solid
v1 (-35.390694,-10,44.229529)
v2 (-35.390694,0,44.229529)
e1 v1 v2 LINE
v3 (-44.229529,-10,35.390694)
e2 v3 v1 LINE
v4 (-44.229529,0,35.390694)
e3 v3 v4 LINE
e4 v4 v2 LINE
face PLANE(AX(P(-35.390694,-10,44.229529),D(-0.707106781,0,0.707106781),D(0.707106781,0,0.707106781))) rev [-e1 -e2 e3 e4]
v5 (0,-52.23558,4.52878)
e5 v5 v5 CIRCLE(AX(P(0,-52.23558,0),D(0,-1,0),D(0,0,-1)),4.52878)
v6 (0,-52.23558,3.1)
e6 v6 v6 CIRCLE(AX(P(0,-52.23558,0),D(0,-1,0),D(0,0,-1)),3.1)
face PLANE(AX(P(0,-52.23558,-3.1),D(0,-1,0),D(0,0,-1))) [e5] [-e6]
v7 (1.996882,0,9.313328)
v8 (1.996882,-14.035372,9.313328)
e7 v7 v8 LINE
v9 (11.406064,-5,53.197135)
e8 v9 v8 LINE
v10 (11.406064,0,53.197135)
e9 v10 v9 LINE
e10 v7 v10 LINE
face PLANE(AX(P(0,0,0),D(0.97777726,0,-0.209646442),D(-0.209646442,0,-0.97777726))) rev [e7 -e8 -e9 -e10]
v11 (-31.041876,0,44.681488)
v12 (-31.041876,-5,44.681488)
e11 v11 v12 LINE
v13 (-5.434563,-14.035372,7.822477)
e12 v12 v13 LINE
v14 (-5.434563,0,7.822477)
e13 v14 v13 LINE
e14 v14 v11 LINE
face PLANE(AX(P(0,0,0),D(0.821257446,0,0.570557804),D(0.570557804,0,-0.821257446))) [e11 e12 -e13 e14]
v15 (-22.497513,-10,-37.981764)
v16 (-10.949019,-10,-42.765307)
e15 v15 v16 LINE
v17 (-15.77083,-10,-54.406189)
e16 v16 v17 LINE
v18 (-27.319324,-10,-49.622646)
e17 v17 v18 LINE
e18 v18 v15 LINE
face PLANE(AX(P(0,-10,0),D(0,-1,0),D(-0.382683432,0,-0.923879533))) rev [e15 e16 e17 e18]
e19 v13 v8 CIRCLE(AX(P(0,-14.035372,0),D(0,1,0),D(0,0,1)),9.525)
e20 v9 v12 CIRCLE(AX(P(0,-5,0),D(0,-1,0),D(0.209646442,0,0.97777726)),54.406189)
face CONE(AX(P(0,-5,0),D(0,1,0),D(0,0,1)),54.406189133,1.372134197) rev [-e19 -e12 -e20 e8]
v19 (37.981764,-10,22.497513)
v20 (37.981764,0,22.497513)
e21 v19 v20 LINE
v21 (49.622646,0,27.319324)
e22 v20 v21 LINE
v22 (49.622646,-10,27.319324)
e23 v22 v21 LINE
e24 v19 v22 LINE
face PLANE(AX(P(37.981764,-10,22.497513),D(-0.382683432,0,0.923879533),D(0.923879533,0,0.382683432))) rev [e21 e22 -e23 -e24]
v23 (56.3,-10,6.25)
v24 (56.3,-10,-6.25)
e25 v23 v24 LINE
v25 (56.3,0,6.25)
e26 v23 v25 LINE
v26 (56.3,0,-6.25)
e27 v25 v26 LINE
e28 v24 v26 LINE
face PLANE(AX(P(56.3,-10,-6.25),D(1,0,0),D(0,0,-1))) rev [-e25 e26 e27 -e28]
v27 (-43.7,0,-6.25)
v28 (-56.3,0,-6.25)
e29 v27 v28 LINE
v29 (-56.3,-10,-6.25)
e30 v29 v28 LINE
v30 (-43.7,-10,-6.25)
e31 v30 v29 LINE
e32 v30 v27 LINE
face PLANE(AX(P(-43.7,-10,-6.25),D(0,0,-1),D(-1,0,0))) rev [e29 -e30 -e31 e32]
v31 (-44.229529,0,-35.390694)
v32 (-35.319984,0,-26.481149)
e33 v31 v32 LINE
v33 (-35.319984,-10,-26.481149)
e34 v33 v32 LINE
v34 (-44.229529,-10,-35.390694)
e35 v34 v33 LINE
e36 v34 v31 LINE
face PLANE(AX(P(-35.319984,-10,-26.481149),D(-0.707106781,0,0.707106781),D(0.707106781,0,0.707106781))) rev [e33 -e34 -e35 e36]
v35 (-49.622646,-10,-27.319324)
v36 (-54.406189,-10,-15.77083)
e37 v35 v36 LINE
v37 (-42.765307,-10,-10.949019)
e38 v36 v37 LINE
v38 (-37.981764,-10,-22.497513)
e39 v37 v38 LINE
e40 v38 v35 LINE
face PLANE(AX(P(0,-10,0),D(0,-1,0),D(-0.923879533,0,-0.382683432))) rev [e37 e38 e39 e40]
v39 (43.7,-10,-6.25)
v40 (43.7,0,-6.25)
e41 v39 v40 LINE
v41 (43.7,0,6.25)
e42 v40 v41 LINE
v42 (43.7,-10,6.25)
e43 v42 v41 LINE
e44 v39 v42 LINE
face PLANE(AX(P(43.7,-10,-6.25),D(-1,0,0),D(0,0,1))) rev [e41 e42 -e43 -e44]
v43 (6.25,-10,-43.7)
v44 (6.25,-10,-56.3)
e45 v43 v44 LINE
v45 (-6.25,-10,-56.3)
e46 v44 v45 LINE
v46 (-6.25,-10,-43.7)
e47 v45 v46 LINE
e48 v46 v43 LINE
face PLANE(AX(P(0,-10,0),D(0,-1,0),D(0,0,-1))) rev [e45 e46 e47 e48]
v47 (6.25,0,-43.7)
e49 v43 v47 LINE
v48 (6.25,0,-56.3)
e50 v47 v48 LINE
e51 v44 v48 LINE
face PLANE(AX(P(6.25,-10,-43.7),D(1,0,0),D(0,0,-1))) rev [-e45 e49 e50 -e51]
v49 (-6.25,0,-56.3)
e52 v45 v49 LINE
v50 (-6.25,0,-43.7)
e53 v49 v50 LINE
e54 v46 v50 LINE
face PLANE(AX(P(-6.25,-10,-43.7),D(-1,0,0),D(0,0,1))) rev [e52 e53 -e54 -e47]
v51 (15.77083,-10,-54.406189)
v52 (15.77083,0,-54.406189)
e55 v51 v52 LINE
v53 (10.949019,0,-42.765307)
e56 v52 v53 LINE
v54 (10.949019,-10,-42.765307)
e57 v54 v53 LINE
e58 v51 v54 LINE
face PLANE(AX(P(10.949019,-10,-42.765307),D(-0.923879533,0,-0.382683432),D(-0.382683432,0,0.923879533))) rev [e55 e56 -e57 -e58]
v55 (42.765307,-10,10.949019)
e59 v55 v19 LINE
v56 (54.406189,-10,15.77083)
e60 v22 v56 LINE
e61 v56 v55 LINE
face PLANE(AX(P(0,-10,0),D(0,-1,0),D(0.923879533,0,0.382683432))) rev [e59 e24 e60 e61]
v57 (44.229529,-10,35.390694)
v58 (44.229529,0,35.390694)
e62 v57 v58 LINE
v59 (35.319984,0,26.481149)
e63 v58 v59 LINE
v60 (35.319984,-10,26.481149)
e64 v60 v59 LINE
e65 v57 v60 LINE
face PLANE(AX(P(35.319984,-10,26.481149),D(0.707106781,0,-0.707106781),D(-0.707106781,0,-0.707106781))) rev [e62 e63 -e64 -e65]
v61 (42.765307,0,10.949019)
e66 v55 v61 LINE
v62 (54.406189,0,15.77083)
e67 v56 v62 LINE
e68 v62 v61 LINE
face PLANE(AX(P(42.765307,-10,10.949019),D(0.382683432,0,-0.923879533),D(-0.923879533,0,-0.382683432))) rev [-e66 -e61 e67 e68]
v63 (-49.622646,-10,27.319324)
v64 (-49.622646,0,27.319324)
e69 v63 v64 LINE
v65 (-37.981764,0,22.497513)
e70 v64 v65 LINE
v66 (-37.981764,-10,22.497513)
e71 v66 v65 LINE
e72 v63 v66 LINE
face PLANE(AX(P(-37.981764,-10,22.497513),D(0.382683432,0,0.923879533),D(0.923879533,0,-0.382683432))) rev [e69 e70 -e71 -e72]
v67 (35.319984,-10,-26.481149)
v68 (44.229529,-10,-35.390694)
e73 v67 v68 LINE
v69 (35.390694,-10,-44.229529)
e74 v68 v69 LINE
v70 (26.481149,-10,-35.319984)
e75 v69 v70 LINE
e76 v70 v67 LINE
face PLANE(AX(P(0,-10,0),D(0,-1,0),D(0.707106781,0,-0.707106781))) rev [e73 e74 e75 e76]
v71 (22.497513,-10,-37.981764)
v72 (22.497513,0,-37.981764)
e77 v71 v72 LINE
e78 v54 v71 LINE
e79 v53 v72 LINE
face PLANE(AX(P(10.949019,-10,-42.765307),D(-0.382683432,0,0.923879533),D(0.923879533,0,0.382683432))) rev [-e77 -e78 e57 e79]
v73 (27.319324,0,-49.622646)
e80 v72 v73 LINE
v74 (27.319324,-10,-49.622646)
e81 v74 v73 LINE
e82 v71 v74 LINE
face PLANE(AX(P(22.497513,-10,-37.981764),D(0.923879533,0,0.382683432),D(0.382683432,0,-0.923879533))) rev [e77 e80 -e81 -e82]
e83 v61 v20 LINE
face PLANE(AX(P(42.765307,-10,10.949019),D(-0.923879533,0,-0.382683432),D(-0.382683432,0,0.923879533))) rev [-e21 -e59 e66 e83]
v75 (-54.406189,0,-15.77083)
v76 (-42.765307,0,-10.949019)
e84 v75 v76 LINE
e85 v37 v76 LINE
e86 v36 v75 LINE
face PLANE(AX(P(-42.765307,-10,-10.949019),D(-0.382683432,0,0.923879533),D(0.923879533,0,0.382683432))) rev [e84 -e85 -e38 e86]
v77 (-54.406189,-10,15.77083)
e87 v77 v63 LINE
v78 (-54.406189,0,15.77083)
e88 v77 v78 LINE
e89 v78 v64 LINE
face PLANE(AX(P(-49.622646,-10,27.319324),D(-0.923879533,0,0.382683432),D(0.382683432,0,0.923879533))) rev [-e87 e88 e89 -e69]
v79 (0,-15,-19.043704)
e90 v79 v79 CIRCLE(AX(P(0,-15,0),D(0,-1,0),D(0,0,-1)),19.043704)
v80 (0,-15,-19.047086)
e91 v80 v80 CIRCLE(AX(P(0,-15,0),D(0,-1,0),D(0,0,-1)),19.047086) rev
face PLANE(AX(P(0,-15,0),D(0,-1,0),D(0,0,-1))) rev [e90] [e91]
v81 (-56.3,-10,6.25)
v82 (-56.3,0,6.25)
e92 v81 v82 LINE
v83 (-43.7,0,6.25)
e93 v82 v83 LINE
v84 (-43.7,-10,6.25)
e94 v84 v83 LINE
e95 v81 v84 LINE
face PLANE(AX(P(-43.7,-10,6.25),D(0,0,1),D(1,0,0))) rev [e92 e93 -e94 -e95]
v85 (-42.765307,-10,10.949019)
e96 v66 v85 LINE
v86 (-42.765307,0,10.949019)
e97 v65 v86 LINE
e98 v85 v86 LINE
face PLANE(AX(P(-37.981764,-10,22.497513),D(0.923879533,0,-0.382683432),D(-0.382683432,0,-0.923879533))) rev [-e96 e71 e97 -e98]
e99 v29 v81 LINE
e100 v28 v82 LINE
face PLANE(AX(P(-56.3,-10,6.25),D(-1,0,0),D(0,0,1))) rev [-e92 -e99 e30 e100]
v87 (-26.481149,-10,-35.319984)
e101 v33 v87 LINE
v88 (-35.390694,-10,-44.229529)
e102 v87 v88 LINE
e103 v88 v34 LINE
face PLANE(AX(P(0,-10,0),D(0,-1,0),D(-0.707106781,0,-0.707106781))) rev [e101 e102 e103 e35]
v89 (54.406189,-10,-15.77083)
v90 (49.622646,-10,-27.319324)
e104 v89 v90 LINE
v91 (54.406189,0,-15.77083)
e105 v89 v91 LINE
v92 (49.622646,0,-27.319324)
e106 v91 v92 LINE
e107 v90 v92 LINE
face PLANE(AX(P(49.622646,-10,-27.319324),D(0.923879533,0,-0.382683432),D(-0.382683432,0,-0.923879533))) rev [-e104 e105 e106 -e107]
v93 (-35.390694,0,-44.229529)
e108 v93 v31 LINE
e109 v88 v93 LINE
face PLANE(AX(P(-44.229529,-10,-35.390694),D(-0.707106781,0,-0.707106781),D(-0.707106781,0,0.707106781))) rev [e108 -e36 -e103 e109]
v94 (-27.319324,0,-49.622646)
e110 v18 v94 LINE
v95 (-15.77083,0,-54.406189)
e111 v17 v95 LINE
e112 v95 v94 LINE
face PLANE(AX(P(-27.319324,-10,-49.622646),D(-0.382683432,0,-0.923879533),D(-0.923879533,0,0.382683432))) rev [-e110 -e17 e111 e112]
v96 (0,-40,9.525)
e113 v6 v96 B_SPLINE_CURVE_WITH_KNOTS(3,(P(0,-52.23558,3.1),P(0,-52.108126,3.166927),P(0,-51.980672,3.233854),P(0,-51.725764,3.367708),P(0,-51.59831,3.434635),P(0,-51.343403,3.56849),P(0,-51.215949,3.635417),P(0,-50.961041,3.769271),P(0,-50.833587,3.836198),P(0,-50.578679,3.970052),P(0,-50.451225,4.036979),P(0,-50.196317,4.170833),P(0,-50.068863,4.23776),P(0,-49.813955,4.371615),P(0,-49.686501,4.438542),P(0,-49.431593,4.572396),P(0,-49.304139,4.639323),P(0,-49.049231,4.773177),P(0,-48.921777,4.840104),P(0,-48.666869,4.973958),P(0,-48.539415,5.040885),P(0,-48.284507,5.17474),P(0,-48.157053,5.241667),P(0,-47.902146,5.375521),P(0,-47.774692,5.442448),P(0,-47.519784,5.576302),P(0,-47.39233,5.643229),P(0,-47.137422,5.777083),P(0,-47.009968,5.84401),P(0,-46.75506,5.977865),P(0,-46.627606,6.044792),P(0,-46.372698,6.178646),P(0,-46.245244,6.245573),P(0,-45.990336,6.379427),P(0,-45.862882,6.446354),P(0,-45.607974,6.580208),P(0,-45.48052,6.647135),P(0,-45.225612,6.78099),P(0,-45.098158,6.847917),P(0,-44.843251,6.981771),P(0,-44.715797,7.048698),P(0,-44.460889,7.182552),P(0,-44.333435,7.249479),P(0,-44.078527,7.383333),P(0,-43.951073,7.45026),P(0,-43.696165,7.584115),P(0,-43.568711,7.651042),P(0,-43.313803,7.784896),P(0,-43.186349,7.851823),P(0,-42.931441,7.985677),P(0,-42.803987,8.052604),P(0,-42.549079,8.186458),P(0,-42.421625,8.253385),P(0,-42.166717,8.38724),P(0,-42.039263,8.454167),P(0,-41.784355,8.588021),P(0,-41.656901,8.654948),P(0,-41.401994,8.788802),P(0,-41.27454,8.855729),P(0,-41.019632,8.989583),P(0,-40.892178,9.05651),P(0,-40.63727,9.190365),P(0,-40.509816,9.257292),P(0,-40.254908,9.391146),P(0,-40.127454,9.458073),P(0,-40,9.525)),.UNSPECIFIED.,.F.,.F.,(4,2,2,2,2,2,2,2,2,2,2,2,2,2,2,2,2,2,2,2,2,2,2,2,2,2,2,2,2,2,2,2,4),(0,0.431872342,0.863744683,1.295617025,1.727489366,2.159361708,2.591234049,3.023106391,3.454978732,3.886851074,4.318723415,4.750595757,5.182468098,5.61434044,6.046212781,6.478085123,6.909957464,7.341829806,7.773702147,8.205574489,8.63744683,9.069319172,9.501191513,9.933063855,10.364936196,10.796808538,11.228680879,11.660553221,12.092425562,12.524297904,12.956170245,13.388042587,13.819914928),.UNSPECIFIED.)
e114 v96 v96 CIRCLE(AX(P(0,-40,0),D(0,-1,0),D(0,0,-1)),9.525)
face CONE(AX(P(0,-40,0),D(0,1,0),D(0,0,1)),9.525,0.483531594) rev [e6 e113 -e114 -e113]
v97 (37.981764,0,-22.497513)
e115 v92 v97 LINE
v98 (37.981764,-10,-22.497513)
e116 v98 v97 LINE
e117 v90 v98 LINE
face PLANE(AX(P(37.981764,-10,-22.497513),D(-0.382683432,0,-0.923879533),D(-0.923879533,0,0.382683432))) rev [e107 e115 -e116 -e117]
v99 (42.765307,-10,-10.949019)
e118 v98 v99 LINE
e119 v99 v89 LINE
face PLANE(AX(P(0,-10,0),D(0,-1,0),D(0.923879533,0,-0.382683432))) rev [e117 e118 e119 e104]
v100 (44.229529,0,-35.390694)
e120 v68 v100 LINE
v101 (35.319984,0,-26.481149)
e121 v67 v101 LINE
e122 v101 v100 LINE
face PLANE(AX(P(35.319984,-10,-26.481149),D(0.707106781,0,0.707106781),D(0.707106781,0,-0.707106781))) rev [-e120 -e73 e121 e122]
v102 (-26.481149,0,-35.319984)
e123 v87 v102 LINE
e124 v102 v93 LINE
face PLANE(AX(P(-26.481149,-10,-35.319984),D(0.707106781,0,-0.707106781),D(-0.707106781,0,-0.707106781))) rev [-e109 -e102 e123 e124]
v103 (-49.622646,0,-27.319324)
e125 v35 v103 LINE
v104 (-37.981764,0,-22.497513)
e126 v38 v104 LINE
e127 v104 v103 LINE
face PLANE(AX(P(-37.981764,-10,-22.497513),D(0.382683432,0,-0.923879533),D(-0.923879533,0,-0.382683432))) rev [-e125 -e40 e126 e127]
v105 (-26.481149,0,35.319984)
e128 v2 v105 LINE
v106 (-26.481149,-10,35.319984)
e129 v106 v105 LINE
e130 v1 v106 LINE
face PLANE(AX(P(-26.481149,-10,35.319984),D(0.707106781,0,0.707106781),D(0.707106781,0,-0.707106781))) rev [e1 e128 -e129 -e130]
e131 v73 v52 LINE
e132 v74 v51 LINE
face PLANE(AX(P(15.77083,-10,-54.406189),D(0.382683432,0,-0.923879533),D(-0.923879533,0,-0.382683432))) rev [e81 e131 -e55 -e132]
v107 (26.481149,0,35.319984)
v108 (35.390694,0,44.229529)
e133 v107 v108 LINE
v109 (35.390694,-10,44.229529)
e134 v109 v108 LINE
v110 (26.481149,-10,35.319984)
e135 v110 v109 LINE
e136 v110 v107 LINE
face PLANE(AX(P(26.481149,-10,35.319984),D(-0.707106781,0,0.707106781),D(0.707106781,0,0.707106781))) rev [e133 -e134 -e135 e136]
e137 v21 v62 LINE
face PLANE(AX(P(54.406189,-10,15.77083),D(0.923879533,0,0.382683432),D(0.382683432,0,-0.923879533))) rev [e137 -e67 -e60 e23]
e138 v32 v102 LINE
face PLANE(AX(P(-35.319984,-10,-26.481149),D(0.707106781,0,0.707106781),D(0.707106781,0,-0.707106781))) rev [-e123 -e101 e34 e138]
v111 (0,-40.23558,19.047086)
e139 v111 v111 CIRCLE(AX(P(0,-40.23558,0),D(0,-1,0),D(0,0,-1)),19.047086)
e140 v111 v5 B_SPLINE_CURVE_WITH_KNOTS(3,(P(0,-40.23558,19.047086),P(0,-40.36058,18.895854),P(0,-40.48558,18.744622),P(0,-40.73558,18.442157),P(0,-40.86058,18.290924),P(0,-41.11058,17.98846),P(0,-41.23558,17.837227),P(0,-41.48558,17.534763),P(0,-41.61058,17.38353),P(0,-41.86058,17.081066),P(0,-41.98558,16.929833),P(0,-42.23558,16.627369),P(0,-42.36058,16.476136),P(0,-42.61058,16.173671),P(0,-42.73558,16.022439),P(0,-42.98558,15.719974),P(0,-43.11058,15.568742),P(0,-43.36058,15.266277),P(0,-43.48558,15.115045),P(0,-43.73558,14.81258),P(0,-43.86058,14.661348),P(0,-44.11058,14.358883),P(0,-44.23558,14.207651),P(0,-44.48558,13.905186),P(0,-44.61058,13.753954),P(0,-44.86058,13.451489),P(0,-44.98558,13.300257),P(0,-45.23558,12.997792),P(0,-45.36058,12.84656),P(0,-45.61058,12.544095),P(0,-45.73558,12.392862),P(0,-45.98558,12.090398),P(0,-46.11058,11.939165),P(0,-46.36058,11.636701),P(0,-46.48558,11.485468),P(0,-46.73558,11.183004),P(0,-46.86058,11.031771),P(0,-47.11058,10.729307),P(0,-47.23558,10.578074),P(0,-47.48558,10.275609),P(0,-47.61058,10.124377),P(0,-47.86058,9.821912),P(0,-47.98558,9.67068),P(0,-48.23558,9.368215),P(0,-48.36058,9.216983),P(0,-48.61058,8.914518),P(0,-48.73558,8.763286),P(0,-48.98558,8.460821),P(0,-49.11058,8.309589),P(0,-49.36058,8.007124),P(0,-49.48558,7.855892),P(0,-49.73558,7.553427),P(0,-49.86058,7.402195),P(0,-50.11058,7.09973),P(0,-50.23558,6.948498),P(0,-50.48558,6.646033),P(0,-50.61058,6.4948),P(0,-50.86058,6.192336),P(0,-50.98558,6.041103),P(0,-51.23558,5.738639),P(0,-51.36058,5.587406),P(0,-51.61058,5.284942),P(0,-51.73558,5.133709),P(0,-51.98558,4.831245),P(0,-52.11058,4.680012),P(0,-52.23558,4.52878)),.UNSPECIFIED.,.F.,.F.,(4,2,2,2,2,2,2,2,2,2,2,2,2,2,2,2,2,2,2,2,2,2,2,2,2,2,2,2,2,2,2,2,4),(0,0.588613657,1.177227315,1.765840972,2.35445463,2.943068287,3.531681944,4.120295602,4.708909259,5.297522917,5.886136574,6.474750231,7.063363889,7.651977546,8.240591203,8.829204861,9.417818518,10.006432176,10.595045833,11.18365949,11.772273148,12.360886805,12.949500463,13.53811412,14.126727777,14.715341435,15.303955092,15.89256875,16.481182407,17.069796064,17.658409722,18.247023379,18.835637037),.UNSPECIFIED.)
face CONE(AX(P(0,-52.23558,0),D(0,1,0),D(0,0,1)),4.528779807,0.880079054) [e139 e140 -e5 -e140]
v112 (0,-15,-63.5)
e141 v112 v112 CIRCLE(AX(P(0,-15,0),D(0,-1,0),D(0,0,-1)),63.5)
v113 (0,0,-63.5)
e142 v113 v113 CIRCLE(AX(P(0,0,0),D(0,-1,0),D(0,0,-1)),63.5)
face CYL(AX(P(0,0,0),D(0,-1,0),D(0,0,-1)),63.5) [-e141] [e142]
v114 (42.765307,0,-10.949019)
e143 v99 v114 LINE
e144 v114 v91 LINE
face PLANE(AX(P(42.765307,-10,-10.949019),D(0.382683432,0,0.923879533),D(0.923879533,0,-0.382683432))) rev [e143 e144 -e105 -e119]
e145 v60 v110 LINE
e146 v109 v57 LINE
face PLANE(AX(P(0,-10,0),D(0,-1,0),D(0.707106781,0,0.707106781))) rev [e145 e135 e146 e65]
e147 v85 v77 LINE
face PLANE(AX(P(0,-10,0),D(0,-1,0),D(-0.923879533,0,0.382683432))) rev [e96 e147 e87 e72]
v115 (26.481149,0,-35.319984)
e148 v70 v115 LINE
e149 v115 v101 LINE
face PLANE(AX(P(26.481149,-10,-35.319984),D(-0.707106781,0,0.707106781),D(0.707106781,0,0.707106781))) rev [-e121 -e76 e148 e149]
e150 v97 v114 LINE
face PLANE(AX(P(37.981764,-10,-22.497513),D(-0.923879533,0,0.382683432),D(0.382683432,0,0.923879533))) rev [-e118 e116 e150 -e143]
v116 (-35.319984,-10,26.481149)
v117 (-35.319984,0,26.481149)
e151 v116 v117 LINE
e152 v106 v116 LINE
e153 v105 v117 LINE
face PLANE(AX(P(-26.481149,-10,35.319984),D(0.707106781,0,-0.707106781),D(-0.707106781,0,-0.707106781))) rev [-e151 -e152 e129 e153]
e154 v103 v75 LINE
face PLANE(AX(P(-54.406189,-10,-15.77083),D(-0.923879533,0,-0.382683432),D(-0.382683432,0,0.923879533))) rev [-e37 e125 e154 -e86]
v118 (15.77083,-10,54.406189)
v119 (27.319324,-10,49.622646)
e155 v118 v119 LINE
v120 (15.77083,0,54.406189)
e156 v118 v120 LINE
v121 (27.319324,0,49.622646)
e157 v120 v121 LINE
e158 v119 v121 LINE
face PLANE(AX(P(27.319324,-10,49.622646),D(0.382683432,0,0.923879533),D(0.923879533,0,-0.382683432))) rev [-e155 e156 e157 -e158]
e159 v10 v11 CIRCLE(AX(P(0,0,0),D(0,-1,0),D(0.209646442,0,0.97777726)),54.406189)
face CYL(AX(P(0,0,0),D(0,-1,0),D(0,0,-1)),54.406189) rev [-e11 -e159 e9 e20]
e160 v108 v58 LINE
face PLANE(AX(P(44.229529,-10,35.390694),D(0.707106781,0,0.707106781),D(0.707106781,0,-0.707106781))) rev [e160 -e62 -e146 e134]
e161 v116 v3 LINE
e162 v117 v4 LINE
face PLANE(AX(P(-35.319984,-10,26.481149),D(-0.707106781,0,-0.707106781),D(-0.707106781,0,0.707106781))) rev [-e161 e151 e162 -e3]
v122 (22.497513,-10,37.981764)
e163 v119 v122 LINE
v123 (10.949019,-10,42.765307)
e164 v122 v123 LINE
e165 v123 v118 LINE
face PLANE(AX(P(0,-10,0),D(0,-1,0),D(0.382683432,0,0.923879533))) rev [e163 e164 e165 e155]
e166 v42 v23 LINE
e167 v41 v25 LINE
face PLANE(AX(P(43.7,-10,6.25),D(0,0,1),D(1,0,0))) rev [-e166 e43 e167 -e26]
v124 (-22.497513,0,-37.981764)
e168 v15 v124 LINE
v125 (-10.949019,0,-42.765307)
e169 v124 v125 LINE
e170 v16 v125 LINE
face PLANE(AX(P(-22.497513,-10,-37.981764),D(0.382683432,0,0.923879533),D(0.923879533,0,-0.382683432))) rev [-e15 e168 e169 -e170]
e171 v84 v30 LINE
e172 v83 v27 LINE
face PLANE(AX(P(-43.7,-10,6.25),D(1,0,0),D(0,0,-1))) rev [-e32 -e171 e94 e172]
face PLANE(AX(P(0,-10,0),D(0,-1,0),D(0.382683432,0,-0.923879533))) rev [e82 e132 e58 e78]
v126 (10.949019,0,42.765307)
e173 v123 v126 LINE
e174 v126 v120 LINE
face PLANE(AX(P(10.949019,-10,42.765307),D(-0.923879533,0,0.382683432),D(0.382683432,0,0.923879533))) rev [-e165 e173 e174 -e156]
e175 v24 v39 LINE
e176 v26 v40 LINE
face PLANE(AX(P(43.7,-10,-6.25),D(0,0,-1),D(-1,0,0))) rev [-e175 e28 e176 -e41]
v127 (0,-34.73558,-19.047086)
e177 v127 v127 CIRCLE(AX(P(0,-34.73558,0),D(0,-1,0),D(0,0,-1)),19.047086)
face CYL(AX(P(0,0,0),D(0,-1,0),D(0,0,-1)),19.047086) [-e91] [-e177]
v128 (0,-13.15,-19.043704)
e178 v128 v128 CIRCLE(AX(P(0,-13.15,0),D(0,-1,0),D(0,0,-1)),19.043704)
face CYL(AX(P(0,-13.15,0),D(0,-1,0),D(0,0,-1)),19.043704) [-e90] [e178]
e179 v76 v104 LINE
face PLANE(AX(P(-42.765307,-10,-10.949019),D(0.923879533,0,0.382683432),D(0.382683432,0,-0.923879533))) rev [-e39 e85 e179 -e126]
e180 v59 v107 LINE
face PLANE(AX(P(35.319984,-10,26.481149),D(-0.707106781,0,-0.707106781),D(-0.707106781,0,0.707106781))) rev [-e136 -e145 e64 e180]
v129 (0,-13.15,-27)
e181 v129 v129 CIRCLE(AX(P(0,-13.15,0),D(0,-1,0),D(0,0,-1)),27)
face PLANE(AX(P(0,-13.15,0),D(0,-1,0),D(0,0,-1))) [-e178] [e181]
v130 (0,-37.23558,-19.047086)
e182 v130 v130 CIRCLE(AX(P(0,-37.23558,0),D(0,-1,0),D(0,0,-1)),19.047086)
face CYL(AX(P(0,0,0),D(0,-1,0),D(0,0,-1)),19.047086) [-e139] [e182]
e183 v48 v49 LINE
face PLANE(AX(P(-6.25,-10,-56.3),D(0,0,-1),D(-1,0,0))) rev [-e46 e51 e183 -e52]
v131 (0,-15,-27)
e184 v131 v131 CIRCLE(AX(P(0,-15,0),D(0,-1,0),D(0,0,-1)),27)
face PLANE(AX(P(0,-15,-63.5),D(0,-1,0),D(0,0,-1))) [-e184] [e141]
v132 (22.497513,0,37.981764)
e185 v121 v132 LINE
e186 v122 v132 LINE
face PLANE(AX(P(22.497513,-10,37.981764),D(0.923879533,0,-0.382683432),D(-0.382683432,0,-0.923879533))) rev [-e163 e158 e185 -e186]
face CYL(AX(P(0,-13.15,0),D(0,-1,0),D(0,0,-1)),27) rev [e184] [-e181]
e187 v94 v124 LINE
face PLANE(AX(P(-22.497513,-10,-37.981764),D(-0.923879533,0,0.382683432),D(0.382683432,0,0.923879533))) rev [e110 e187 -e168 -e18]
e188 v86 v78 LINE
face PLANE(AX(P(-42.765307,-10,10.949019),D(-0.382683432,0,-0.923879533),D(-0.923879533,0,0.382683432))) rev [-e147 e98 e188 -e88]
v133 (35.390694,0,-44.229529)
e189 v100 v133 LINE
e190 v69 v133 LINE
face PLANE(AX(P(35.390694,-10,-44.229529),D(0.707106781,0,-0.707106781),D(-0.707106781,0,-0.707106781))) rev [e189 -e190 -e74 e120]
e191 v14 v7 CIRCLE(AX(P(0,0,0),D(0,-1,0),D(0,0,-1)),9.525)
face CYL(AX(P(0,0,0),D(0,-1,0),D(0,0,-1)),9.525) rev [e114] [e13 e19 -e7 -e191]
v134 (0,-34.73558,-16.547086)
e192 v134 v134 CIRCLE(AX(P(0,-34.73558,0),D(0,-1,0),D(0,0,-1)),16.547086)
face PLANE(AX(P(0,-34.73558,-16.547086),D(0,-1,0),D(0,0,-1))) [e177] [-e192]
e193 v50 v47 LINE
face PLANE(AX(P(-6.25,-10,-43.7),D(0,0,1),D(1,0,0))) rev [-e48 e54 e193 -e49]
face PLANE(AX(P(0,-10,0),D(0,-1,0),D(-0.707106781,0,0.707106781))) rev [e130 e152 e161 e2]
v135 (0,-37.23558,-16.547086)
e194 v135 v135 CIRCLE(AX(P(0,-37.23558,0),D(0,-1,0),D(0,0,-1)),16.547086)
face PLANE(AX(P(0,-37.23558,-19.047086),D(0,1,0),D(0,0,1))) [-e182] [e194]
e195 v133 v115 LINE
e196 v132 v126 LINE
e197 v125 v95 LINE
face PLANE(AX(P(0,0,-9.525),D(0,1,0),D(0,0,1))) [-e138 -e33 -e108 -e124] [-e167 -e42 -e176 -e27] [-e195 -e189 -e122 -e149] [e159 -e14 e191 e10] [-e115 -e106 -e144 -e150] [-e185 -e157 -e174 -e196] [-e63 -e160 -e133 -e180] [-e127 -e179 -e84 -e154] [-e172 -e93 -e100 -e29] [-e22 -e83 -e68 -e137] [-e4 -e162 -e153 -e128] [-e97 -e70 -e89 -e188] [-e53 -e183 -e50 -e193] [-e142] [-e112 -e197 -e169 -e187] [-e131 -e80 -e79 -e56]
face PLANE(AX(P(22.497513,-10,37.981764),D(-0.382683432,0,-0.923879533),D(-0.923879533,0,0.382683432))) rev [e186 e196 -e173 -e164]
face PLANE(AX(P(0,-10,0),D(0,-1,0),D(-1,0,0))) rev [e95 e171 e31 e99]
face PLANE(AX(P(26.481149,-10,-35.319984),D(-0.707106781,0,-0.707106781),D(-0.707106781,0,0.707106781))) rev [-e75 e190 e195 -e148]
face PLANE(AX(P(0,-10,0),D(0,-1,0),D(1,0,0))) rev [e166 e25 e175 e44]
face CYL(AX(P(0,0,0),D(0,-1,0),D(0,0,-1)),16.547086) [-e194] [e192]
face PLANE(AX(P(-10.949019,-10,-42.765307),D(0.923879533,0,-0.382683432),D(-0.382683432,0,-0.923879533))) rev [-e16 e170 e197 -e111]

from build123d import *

# Parameters (mm, degrees)
SKETCH3_W          = 12.5
SKETCH3_H          = 12.6
CUT_EXTRUDE1_DEPTH = 10
CIRPATTERN1_COUNT  = 16
CUT_SWEEP3_ANGLE   = 46.890766
SKETCH8_R          = 27
SKETCH8_R_2        = 19.043703719
CUT_EXTRUDE2_DEPTH = 1.85


# Read off the part's stored shape, not the designer's step: Cut-Sweep3
with BuildPart() as part:
    # Sketch1 → Revolve1 (revolve)
    with BuildSketch(Plane(origin=(0, 0, 0), x_dir=(0, 0, -1), z_dir=(1, 0, 0))):
        Polygon((9.525, 0), (63.5, 0), (63.5, -15), (19.047086271, -15), (19.047086271, -34.735580232), (16.547086271, -34.735580232), (16.547086271, -37.235580232), (19.047086271, -37.235580232), (19.047086271, -40.235580232), (4.528779807, -52.235580232), (3.1, -52.235580232), (9.525, -40), align=None)
    revolve(axis=Axis((0, 0, 0), (0, 1, 0)))

    # Sketch3 → Cut-Extrude1 (cut)
    with BuildSketch(Plane(origin=(0, 0, 0), x_dir=(1, 0, 0), z_dir=(0, 1, 0))):
        with Locations((0, 50)):
            Rectangle(SKETCH3_W, SKETCH3_H)
    cut_extrude1 = extrude(amount=-CUT_EXTRUDE1_DEPTH, mode=Mode.SUBTRACT)

    # CirPattern1: Cut-Extrude1 ×16 about axis, 2 skipped
    cirpattern1_axis = Axis((0, 0, 0), (0, -1, 0))
    add([cut_extrude1.rotate(cirpattern1_axis, i * 360 / CIRPATTERN1_COUNT) for i in range(1, CIRPATTERN1_COUNT) if i not in (8, 9)], mode=Mode.SUBTRACT)

    # Cut-Sweep3 outline → Cut-Sweep3 (revolve, cut)
    with BuildSketch(Plane(origin=(0, 0, 0), x_dir=(-0.5705578043075098, 0, 0.8212574455941287), z_dir=(-0.8212574455941287, 0, -0.5705578043075098))):
        Polygon((54.406189133, -5), (54.406189133, 0), (9.525, 0), (9.525, -14.035371812), align=None)
    revolve(axis=Axis((0, 0, 0), (0, 1, 0)), revolution_arc=CUT_SWEEP3_ANGLE, mode=Mode.SUBTRACT)

    # Sketch8 → Cut-Extrude2 (cut)
    with BuildSketch(Plane.XZ.offset(15)):
        with Locations(Location((0, 0, 0), (0, 0, 270))):
            Circle(SKETCH8_R)
        with Locations(Location((0, 0, 0), (0, 0, 270))):
            Circle(SKETCH8_R_2, mode=Mode.SUBTRACT)
    extrude(amount=-CUT_EXTRUDE2_DEPTH, mode=Mode.SUBTRACT)


solid = part.part
